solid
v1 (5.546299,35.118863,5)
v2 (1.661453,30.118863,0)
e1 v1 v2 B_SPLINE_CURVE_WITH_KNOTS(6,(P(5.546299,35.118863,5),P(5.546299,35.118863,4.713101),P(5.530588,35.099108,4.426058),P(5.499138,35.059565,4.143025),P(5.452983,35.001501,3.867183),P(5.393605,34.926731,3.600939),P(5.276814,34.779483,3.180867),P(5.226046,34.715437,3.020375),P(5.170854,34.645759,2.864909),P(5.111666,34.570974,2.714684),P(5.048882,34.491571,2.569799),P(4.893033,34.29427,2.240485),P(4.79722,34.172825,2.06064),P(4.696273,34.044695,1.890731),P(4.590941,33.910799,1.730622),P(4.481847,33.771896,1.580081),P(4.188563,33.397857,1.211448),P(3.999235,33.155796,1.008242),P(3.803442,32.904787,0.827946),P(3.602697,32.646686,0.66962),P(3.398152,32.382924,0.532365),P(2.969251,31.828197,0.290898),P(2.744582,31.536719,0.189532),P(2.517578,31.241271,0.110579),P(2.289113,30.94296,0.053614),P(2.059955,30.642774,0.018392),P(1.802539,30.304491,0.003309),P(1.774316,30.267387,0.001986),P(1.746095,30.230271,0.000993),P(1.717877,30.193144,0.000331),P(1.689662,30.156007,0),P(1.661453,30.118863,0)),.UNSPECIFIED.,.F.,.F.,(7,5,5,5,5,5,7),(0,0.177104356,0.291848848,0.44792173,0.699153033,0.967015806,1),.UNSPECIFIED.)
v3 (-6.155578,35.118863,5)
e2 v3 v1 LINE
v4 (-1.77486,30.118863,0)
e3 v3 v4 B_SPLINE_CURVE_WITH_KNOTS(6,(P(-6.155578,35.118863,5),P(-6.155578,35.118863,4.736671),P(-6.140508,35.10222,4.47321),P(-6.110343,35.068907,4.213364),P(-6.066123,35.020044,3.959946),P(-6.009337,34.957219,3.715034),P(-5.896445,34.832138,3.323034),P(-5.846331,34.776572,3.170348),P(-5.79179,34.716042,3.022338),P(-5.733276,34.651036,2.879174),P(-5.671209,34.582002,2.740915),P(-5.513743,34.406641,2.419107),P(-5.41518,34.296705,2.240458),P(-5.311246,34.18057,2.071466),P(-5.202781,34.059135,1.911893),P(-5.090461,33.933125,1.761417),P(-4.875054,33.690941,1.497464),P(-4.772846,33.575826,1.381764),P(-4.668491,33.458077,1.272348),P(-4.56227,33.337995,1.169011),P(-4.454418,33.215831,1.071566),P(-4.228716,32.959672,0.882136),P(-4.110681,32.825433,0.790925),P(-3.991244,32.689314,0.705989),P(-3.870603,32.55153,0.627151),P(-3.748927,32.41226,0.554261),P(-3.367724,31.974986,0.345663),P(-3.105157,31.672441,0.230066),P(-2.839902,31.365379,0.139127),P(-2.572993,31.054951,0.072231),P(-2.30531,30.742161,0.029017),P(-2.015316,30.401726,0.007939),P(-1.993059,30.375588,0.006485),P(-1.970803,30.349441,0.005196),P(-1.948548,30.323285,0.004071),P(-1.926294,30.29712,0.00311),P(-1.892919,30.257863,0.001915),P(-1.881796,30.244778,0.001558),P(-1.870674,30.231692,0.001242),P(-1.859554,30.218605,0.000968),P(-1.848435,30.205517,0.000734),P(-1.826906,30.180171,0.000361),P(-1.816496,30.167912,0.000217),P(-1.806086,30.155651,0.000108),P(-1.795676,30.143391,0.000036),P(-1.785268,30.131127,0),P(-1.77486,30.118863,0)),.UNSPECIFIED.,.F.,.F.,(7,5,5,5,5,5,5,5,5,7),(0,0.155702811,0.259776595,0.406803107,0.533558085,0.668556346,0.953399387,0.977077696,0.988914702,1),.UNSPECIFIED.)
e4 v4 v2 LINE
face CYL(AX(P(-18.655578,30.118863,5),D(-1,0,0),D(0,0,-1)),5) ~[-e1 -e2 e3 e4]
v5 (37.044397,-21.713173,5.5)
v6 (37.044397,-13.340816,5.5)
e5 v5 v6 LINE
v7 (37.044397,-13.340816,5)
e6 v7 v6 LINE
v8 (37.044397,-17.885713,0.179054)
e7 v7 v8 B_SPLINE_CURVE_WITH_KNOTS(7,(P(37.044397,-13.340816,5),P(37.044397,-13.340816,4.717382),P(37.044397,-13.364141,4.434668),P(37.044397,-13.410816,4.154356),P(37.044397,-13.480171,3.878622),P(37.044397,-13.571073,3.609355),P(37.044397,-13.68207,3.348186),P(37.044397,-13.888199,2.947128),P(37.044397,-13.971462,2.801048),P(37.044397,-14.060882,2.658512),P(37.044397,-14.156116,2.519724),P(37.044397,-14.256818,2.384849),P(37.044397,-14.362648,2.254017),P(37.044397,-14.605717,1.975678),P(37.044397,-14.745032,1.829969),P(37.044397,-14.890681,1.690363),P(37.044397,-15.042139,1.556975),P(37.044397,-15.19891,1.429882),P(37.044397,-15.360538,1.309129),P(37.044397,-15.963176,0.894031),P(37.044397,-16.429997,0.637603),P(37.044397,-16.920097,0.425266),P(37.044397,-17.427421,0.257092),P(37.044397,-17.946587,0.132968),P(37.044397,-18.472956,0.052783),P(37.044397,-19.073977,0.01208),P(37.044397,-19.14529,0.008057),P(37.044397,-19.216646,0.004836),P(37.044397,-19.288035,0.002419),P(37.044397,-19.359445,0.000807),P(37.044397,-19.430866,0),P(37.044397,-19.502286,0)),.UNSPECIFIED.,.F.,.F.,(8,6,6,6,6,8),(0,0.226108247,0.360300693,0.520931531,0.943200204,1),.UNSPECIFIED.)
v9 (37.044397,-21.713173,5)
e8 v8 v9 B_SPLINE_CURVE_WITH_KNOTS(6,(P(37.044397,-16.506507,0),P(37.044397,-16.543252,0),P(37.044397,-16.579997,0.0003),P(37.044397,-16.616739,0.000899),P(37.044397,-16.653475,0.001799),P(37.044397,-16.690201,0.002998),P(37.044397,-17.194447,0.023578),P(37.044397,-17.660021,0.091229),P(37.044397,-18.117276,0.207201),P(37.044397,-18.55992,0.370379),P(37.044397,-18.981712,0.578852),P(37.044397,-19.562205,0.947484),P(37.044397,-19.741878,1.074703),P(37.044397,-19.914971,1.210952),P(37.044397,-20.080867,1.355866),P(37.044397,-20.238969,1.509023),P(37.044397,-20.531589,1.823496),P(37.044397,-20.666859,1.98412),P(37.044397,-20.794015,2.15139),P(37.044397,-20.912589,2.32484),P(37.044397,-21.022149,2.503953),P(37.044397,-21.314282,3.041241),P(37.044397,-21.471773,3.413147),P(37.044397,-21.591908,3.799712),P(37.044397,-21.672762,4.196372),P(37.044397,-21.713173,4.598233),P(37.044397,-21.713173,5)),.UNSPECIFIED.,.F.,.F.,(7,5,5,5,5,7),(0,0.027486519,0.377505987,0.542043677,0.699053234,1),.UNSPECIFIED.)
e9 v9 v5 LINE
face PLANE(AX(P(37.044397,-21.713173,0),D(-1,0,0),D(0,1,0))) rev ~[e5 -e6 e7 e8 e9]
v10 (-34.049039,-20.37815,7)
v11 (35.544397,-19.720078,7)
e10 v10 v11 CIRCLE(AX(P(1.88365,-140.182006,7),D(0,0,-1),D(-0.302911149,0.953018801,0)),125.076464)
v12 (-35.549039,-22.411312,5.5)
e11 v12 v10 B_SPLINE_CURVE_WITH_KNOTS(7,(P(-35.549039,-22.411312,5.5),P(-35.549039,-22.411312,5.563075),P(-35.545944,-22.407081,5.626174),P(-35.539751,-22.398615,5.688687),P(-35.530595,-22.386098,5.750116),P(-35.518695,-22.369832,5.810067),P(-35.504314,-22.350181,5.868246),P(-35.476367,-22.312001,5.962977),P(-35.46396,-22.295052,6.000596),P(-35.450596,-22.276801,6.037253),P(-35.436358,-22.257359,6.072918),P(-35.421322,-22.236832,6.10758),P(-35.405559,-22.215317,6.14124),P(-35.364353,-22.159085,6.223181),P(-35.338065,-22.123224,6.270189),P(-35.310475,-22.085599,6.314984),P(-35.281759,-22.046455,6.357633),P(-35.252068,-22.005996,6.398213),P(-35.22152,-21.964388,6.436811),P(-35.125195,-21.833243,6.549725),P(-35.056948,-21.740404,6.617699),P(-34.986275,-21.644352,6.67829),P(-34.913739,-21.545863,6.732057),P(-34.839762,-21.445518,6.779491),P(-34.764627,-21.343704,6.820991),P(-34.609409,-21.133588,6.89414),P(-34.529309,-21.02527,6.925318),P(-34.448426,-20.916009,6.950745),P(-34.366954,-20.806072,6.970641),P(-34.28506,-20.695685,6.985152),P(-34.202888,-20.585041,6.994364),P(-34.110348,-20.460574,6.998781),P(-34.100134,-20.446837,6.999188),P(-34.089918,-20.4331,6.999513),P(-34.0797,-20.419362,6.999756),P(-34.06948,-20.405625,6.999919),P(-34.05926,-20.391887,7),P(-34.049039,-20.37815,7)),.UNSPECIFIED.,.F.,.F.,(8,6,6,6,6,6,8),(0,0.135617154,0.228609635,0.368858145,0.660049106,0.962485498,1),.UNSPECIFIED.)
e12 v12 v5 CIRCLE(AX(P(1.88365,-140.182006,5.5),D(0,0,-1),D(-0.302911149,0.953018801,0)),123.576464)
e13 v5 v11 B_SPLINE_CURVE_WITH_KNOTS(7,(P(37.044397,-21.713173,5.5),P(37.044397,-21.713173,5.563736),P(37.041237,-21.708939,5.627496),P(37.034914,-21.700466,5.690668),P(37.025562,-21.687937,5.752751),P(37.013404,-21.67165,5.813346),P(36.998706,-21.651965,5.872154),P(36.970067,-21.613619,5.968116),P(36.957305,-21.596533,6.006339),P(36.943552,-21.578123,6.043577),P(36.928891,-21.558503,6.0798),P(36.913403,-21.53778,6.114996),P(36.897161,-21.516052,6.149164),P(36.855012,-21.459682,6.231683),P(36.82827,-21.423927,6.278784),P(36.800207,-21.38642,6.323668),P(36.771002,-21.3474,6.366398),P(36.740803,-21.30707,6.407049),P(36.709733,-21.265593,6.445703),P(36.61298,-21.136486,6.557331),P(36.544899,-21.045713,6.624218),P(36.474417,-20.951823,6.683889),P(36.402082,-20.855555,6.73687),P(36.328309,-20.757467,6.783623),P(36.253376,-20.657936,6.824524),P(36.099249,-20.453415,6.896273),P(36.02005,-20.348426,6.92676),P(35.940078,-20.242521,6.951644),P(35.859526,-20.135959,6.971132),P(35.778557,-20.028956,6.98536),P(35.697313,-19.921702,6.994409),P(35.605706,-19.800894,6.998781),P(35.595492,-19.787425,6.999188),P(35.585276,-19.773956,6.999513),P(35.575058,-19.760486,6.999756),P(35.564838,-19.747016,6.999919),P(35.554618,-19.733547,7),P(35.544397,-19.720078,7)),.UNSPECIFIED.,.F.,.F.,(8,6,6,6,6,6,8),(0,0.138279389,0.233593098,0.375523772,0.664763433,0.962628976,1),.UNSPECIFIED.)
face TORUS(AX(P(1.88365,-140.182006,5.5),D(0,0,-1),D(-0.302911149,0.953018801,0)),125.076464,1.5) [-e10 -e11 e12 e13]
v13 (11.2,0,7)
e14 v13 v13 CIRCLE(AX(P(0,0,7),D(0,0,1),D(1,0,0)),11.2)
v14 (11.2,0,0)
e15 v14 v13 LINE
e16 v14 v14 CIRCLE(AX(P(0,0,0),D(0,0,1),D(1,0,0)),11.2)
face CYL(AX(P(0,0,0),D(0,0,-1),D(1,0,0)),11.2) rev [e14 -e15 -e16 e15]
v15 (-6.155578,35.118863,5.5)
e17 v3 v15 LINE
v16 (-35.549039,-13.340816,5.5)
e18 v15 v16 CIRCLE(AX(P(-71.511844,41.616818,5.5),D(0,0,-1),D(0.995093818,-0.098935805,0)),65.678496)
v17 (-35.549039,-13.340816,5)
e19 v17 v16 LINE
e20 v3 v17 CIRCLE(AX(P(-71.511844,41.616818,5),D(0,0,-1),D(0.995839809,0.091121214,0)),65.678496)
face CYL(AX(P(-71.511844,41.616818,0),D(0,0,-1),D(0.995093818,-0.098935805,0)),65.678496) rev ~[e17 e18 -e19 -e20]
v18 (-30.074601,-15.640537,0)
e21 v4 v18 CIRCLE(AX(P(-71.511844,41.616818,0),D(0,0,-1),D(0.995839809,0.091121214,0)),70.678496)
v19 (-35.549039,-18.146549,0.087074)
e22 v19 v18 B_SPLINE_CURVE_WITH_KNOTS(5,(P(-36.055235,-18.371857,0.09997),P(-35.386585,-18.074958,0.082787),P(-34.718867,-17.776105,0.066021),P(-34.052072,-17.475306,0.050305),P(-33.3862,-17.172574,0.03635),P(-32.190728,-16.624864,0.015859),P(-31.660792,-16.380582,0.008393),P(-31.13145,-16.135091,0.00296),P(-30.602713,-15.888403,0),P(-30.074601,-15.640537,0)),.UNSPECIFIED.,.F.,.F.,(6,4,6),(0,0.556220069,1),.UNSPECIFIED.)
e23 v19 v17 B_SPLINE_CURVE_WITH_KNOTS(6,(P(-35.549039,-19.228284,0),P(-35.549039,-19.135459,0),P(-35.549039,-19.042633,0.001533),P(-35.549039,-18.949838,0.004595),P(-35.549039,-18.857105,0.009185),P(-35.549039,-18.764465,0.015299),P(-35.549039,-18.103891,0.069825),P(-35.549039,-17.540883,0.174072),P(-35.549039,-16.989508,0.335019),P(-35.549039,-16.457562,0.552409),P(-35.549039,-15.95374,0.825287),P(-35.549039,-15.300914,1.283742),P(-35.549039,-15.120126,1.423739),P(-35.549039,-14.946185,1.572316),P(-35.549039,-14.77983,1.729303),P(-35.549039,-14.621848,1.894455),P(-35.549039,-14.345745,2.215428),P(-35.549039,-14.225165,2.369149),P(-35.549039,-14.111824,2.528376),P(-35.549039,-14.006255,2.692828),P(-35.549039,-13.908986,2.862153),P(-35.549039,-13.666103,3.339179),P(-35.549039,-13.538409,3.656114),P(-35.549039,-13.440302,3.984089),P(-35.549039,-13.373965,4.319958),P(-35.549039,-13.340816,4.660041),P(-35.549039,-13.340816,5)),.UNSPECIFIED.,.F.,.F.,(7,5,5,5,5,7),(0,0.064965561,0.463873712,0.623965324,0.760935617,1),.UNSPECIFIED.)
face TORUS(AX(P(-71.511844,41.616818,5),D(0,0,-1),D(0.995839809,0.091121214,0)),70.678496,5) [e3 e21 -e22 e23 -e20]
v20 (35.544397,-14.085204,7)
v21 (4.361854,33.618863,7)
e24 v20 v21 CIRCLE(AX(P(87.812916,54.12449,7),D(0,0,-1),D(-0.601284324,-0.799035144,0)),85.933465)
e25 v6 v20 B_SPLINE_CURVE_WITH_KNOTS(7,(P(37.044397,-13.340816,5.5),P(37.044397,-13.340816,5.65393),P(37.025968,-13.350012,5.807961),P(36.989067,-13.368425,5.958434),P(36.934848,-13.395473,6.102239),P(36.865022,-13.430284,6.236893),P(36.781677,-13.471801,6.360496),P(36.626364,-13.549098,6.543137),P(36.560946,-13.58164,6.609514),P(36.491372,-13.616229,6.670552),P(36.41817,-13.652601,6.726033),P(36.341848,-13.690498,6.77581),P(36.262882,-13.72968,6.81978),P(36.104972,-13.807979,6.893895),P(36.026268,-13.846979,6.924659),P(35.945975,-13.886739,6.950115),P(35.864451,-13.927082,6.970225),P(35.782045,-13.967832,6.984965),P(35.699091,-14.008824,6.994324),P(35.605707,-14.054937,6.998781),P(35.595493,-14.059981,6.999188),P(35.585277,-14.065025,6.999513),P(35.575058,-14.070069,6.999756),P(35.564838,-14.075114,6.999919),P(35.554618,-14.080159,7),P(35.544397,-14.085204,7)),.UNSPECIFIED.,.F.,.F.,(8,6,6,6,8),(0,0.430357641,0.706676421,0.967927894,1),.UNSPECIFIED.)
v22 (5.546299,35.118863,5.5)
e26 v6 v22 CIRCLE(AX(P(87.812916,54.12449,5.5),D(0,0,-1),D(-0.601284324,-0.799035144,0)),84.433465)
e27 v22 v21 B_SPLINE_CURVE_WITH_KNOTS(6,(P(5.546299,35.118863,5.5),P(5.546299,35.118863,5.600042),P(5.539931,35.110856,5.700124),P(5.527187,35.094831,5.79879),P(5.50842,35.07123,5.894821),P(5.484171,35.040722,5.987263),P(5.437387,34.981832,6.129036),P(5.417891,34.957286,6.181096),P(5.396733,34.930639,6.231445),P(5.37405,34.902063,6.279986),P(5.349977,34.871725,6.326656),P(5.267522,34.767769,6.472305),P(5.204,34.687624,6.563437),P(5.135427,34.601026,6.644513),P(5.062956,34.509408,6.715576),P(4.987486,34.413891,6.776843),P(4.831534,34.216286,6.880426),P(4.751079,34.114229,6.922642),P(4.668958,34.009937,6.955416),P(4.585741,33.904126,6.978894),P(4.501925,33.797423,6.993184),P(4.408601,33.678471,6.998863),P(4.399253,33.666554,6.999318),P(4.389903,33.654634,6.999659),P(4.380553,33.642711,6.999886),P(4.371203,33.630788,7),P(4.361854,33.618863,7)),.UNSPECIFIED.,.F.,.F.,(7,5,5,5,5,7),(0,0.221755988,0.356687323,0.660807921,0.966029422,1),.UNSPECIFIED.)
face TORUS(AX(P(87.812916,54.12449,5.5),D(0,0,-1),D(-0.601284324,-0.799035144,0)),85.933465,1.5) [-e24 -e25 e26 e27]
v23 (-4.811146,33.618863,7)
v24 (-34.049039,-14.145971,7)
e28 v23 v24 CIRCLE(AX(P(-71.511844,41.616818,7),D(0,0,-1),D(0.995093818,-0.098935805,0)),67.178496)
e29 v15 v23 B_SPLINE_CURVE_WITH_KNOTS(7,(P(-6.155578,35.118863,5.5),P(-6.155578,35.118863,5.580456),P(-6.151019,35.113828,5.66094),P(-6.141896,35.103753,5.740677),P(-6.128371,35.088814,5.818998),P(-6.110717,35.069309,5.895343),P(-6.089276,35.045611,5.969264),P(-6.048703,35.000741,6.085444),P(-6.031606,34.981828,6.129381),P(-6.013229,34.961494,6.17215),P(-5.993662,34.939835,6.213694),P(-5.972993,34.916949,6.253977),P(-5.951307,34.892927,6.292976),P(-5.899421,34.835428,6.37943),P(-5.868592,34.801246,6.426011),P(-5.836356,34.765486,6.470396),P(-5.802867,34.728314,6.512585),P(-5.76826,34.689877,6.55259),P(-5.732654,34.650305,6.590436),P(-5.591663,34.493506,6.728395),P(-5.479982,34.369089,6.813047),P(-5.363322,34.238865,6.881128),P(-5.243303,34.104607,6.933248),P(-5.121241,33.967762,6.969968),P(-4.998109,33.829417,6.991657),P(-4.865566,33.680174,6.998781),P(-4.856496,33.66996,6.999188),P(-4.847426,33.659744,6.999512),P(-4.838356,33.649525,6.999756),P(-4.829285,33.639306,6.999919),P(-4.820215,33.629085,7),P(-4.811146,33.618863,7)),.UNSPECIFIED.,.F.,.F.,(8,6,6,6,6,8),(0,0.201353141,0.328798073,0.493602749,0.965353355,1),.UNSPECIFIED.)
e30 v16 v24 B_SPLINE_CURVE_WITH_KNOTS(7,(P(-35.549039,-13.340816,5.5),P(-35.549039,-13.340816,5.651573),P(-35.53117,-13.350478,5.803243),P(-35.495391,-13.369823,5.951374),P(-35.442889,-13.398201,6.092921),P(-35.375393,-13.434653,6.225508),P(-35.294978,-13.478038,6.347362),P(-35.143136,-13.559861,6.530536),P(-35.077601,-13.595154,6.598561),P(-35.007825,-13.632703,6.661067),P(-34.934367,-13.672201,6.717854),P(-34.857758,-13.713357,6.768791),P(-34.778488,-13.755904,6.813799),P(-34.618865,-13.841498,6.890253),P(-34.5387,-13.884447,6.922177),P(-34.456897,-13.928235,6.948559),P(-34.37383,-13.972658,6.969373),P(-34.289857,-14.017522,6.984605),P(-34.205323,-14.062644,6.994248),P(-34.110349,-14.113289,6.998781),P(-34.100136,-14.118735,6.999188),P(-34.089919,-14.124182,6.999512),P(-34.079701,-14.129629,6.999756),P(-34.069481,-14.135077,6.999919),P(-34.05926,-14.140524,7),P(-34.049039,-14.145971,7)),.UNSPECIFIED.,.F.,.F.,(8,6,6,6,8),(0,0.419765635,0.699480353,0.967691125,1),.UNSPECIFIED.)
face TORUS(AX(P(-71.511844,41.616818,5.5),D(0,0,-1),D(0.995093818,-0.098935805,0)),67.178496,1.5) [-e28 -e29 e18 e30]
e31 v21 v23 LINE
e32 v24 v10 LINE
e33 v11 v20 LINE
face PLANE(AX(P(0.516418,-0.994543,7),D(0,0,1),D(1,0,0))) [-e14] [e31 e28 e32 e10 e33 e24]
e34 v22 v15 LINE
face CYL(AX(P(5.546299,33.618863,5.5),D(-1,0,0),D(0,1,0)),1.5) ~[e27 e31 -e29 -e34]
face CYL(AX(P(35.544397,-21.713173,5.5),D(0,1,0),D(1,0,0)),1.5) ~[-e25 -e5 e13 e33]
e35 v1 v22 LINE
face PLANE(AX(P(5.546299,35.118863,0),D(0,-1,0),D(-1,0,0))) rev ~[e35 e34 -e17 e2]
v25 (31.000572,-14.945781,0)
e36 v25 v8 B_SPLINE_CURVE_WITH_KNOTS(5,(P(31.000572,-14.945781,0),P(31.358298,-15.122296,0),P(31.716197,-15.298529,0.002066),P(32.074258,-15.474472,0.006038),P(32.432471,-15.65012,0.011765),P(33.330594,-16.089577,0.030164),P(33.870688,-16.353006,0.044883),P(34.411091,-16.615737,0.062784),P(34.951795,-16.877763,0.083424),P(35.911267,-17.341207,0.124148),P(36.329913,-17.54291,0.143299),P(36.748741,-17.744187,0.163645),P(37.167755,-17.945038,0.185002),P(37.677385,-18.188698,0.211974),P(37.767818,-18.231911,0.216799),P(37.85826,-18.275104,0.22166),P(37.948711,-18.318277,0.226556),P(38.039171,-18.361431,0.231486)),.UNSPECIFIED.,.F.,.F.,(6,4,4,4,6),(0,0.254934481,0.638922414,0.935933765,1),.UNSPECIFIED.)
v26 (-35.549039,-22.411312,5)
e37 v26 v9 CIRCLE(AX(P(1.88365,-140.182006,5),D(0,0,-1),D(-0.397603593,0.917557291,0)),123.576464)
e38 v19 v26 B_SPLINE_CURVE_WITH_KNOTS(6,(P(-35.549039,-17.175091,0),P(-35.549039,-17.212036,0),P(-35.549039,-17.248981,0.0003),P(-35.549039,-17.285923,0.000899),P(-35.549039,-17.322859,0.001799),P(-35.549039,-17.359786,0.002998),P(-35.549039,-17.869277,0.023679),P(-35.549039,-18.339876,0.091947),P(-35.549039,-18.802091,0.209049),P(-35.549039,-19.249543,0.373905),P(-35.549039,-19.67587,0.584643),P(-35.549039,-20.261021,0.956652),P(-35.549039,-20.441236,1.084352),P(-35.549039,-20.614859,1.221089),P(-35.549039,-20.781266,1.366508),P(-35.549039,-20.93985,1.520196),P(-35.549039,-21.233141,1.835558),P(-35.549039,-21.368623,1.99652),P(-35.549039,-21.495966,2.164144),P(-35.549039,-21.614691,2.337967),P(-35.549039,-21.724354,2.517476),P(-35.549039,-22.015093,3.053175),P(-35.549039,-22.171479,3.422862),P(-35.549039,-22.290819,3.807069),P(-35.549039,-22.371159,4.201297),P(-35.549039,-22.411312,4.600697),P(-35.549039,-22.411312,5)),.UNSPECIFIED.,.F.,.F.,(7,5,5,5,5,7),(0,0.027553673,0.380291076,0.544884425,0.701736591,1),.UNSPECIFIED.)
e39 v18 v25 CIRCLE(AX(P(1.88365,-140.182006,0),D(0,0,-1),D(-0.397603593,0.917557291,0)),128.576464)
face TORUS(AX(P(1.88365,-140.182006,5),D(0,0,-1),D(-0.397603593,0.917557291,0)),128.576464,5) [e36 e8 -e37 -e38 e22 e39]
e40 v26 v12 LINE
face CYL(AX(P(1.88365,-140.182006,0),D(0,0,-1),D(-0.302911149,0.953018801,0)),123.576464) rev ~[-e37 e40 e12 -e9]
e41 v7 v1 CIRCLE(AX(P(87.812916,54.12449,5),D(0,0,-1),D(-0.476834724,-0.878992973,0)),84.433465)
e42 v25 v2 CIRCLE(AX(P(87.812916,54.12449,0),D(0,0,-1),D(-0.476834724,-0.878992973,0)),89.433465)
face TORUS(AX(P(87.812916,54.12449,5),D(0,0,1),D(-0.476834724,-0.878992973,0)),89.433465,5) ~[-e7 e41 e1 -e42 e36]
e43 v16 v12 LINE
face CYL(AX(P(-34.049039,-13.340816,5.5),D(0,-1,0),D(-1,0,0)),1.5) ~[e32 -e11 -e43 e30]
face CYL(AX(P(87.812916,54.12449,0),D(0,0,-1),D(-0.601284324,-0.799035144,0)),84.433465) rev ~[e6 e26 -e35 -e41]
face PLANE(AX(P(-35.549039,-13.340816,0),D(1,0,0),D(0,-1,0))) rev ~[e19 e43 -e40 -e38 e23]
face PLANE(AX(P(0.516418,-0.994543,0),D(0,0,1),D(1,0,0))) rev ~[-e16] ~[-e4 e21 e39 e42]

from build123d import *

# Parameters (mm, degrees)
F0_R        = 11.2
F1_DEPTH    = 7
F2_R        = 1.5
F3_T1_DEPTH = 36.7018774228
F3_T4_ANGLE = 72.934456587
F3_T6_ANGLE = 45.7548994245
F3_T8_ANGLE = 56.9956661229


# Not quite as in the source:
# - a fillet or chamfer that OpenCascade refuses, or shapes differently, is made with other operations: its cross-section is extruded or revolved along the edge and cut away or added


with BuildPart() as f1:
    # F0 (on Top) → F1 (new body)
    with BuildSketch(Plane.XY):
        with BuildLine():
            ThreePointArc((-6.1555781478, 35.1188629866), (-15.3560457965, 7.5552379901), (-35.5490386319, -13.3408159018))
            Line((-35.5490386319, -13.3408159018), (-35.5490386319, -22.4113118275))
            ThreePointArc((-35.5490386319, -22.4113118275), (0.6952562714, -16.6112557297), (37.0443966853, -21.713172521))
            Line((37.0443966853, -21.713172521), (37.0443966853, -13.3408159018))
            ThreePointArc((37.0443966853, -13.3408159018), (17.019752647, 8.1099477957), (5.546299275, 35.1188629866))
            Line((5.546299275, 35.1188629866), (-6.1555781478, 35.1188629866))
        make_face()
        Circle(F0_R, mode=Mode.SUBTRACT)
    extrude(amount=F1_DEPTH)

    # F2
    f2_edges = [f1.edges().sort_by_distance(p)[0] for p in [
        (-35.549039, -17.876064, 7),
        (0.695256, -16.611256, 7),
        (-15.356046, 7.555238, 7),
        (17.019753, 8.109948, 7),
        (37.044397, -17.526994, 7),
        (-0.304639, 35.118863, 7),
    ]]
    fillet(f2_edges, radius=F2_R)

    # F3: fillet of radius 5 on 6 edges, made by hand

    # F3_s2 → F3_t1 (cut)
    with BuildSketch(Plane.YZ.offset(-18.6555781478)):
        with BuildLine():
            ThreePointArc((30.1188629866, 0), (33.6543968925, 1.4644660941), (35.1188629866, 5))
            Line((35.1188629866, 5), (35.1188629866, 0))
            Line((35.1188629866, 0), (30.1188629866, 0))
        make_face()
    extrude(amount=F3_T1_DEPTH, mode=Mode.SUBTRACT)

    # F3_s3 → F3_t4 (revolve, cut)
    with BuildSketch(Plane(origin=(-4.3701670653, 47.7604075053, 0), x_dir=(0, 0, 1), z_dir=(-0.0911212144, 0.9958398085, 0))):
        with BuildLine():
            ThreePointArc((0, 3.2563304614), (1.4644660941, -0.2792034445), (5, -1.7436695386))
            Line((5, -1.7436695386), (0, -1.7436695386))
            Line((0, -1.7436695386), (0, 3.2563304614))
        make_face()
    revolve(axis=Axis((-71.5118436224, 41.6168178894, 0), (0, 0, -1)), revolution_arc=F3_T4_ANGLE, mode=Mode.SUBTRACT)

    # F3_s5 → F3_t6 (revolve, cut)
    with BuildSketch(Plane(origin=(-49.5559041376, -21.4739784979, 0), x_dir=(0, 0, 1), z_dir=(-0.9175572913, -0.3976035931, 0))):
        with BuildLine():
            ThreePointArc((0, -0.7975032251), (1.4644660941, -4.333037131), (5, -5.7975032251))
            Line((5, -5.7975032251), (0, -5.7975032251))
            Line((0, -5.7975032251), (0, -0.7975032251))
        make_face()
    revolve(axis=Axis((1.8836501986, -140.182005695, 0), (0, 0, -1)), revolution_arc=F3_T6_ANGLE, mode=Mode.SUBTRACT)

    # F3_s7 → F3_t8 (revolve, cut)
    with BuildSketch(Plane(origin=(45.161339961, -24.4990526211, 0), x_dir=(0, 0, 1), z_dir=(0.8789929725, -0.4768347243, 0))):
        with BuildLine():
            ThreePointArc((5, -5.0138287397), (1.4644660941, -3.5493626456), (0, -0.0138287397))
            Line((0, -0.0138287397), (0, -5.0138287397))
            Line((0, -5.0138287397), (5, -5.0138287397))
        make_face()
    revolve(axis=Axis((87.8129156777, 54.1244901178, 0), (0, 0, -1)), revolution_arc=F3_T8_ANGLE, mode=Mode.SUBTRACT)


solid = f1.part
